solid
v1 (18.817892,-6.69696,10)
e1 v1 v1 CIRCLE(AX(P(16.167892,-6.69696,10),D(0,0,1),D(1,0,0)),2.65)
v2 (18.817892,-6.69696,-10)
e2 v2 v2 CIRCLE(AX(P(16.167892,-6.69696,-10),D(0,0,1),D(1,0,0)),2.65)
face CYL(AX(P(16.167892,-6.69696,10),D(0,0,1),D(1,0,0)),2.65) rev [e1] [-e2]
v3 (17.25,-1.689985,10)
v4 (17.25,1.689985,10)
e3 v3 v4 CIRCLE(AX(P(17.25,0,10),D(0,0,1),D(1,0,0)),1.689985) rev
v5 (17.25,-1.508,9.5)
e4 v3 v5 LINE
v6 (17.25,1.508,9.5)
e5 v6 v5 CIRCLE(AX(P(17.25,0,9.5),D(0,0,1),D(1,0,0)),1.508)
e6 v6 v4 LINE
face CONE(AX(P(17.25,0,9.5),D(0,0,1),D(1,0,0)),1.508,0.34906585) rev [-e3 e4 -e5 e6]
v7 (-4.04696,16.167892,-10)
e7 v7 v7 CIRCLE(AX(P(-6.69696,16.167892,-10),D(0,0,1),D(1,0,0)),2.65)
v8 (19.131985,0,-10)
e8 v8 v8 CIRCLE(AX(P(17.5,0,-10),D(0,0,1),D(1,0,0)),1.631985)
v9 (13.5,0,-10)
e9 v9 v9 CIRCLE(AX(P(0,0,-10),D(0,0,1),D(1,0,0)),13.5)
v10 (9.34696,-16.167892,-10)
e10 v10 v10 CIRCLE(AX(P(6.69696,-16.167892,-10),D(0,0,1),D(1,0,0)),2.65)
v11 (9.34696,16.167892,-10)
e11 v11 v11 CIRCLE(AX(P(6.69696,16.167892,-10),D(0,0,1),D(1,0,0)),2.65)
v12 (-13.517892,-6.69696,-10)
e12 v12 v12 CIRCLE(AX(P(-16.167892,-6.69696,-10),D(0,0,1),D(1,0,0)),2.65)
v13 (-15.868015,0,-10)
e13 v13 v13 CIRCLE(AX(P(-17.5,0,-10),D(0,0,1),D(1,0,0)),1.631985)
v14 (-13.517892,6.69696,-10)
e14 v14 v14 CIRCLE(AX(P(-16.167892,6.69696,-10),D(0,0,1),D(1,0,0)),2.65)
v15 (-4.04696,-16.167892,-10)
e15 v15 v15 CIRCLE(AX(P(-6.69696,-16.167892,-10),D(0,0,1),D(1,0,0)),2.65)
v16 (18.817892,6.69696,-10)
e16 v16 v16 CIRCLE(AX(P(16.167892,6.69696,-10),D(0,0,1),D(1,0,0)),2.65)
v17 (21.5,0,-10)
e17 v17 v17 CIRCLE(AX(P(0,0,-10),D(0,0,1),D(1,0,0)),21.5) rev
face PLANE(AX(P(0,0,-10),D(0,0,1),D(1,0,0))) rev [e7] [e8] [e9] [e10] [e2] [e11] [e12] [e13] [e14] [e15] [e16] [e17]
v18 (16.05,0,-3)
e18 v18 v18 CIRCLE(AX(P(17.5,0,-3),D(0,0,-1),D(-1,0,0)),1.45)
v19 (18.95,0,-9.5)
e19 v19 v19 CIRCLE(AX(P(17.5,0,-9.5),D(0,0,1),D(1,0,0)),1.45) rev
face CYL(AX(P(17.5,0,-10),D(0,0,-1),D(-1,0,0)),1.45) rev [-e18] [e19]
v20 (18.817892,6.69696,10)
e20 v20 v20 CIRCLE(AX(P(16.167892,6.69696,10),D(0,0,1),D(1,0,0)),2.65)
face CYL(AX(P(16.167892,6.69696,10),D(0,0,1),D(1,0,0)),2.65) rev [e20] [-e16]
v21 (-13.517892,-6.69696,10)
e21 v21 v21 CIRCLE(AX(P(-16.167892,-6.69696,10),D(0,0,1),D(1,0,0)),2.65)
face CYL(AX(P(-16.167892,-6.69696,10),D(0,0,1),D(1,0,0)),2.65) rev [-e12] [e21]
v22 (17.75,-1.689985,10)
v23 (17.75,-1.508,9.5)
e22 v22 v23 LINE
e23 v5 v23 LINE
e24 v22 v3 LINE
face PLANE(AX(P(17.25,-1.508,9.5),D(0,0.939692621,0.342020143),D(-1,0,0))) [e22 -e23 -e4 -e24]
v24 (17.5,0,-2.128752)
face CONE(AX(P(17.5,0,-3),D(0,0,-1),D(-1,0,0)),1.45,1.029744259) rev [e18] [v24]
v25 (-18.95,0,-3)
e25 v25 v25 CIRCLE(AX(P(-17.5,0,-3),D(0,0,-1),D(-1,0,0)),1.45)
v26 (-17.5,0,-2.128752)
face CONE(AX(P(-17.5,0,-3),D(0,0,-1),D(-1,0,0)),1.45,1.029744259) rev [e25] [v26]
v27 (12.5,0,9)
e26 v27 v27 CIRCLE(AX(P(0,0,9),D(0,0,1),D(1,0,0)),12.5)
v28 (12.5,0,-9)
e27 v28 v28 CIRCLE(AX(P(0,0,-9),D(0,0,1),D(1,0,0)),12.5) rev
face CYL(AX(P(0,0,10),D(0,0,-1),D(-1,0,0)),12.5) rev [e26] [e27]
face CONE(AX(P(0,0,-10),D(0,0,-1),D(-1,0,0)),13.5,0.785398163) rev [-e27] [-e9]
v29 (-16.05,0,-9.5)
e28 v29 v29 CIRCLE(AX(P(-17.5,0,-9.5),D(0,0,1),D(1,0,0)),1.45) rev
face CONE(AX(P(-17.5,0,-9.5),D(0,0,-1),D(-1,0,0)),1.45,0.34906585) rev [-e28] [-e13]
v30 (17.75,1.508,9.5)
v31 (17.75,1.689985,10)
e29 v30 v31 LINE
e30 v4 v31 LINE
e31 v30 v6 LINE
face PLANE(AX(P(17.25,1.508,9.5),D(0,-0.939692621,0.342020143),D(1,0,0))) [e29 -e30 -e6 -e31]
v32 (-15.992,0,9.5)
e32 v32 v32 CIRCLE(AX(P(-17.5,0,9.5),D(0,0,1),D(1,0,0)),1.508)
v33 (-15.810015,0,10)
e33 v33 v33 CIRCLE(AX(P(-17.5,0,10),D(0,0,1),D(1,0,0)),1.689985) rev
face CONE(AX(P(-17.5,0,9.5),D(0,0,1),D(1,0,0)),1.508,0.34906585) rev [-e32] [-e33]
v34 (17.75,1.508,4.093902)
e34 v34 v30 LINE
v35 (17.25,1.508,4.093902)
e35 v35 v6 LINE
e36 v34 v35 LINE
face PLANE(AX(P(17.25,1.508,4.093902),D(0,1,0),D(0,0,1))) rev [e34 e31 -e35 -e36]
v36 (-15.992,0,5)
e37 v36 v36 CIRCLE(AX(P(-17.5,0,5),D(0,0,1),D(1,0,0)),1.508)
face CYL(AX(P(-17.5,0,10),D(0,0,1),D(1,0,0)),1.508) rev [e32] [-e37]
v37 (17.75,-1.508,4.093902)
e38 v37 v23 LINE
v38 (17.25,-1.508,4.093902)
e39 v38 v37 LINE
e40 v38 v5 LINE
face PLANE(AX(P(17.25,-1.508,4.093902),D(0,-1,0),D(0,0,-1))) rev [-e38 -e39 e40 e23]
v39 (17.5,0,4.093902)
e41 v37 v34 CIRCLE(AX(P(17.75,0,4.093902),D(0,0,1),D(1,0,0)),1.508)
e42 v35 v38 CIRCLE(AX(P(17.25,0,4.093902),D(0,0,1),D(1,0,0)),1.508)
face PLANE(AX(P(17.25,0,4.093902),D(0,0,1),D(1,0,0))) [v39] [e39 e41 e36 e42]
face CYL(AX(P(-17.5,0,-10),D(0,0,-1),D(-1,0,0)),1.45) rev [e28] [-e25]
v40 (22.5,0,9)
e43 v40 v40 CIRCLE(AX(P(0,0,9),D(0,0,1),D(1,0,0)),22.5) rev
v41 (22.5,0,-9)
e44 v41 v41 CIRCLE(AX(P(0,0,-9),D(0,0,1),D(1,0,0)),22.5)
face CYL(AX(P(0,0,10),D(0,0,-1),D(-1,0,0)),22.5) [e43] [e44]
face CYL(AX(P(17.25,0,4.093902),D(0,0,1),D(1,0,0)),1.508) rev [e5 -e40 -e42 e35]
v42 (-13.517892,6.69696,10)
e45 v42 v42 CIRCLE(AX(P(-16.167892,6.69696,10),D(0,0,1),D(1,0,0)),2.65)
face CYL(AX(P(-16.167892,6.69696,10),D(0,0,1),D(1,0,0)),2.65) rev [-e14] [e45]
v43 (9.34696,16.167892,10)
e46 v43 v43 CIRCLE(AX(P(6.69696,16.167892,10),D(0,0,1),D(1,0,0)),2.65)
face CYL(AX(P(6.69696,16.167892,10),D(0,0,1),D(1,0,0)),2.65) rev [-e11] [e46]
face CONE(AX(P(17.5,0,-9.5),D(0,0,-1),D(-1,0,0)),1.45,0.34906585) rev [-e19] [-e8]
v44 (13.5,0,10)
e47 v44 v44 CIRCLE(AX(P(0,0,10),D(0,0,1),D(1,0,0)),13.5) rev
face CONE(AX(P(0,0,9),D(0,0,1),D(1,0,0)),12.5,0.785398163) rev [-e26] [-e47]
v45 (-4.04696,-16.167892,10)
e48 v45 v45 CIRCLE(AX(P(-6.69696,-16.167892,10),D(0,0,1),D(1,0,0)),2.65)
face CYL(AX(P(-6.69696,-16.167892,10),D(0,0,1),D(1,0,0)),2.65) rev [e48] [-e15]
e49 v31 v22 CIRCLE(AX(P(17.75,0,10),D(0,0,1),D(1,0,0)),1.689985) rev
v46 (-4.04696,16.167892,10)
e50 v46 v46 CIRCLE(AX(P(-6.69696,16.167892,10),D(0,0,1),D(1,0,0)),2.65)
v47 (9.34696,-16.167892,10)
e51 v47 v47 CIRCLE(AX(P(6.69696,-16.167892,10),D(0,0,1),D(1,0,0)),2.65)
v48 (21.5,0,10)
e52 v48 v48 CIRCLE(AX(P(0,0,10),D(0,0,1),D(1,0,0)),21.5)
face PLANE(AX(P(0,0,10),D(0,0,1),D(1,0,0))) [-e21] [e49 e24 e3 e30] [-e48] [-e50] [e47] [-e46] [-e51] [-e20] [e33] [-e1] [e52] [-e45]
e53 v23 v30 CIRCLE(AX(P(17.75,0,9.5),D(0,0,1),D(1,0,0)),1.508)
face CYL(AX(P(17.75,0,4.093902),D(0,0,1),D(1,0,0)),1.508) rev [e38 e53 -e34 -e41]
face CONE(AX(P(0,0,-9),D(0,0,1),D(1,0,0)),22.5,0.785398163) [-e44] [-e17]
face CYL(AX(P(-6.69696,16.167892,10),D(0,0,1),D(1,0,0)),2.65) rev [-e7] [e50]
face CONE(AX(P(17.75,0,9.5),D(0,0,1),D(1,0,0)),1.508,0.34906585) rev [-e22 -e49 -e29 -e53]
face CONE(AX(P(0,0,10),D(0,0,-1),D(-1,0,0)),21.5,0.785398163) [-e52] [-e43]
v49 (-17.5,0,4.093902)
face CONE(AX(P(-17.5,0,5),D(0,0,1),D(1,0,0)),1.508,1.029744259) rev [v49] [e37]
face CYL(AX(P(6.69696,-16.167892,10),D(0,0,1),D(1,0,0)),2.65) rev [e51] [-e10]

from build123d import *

# Parameters (mm, degrees)
SKETCH1_R                           = 22.5
SKETCH1_R_2                         = 12.5
BOSS_EXTRUDE1_DEPTH                 = 10
M5_CLEARANCE_HOLE1_D                = 5.3
F_3_0MM_CLEARANCE_DOWEL_HOLE1_D     = 3.016
F_3_0MM_CLEARANCE_DOWEL_HOLE1_DEPTH = 5
F_3_0MM_CLEARANCE_DOWEL_HOLE1_TIP   = 0.906097813
F_2_9_2_9_DIAMETER_HOLE1_D          = 2.9
F_2_9_2_9_DIAMETER_HOLE1_DEPTH      = 7
F_2_9_2_9_DIAMETER_HOLE1_TIP        = 0.871247898
CUT_EXTRUDE1_START                  = -5.906098
CUT_EXTRUDE1_DEPTH                  = 5.906098
CHAMFER1_SIZE                       = 1
CHAMFER2_SIZE                       = 0.181985117
CHAMFER2_SIZE_2                     = 0.5


with BuildPart() as part:
    # Sketch1 → Boss-Extrude1 (new, symmetric)
    with BuildSketch(Plane.XY):
        Circle(SKETCH1_R)
        Circle(SKETCH1_R_2, mode=Mode.SUBTRACT)
    extrude(amount=BOSS_EXTRUDE1_DEPTH, both=True)

    # M5 Clearance Hole1 (through all)
    with Locations(Plane.XY.offset(10)):
        with Locations((6.696960066, -16.167891819), (16.167891819, -6.696960066), (16.167891819, 6.696960066), (6.696960066, 16.167891819), (-6.696960066, 16.167891819), (-16.167891819, 6.696960066), (-16.167891819, -6.696960066), (-6.696960066, -16.167891819)):
            Hole(M5_CLEARANCE_HOLE1_D / 2)

    # Ø3.0mm Clearance Dowel Hole1
    with Locations(Plane.XY.offset(10)):
        with Locations((-17.5, 0), (17.5, 0)):
            Hole(F_3_0MM_CLEARANCE_DOWEL_HOLE1_D / 2, depth=F_3_0MM_CLEARANCE_DOWEL_HOLE1_DEPTH)
            with Locations((0, 0, -(F_3_0MM_CLEARANCE_DOWEL_HOLE1_DEPTH + F_3_0MM_CLEARANCE_DOWEL_HOLE1_TIP / 2))):  # 118° drill point
                Cone(0, F_3_0MM_CLEARANCE_DOWEL_HOLE1_D / 2, F_3_0MM_CLEARANCE_DOWEL_HOLE1_TIP, mode=Mode.SUBTRACT)

    # Ø2.9 (2.9) Diameter Hole1
    with Locations(Plane(origin=(0, 0, -10), x_dir=(-1, 0, 0), z_dir=(0, 0, -1))):
        with Locations((-17.5, 0), (17.5, 0)):
            Hole(F_2_9_2_9_DIAMETER_HOLE1_D / 2, depth=F_2_9_2_9_DIAMETER_HOLE1_DEPTH)
            with Locations((0, 0, -(F_2_9_2_9_DIAMETER_HOLE1_DEPTH + F_2_9_2_9_DIAMETER_HOLE1_TIP / 2))):  # 118° drill point
                Cone(0, F_2_9_2_9_DIAMETER_HOLE1_D / 2, F_2_9_2_9_DIAMETER_HOLE1_TIP, mode=Mode.SUBTRACT)

    # Sketch8 → Cut-Extrude1 (cut)
    with BuildSketch(Plane.XY.offset(10).offset(CUT_EXTRUDE1_START)):
        with BuildLine():
            Line((17.25, 1.508), (17.75, 1.508))
            ThreePointArc((17.75, 1.508), (19.258, 0), (17.75, -1.508))
            Line((17.75, -1.508), (17.25, -1.508))
            ThreePointArc((17.25, -1.508), (15.742, 0), (17.25, 1.508))
        make_face()
    extrude(amount=CUT_EXTRUDE1_DEPTH, mode=Mode.SUBTRACT)

    # Chamfer1
    chamfer1_edges = [part.edges().sort_by_distance(p)[0] for p in [
        (-22.5, 0, -10),
        (-22.5, 0, 10),
        (-12.5, 0, -10),
        (-12.5, 0, 10),
    ]]
    chamfer(chamfer1_edges, length=CHAMFER1_SIZE)

    # Chamfer2
    # the kernel refuses this chamfer: 0.5, 0.181985117 mm, written as the material it takes off along each edge
    with BuildSketch(Plane(origin=(-17.5, 0, 10), x_dir=(-1, 0, 0), z_dir=(0, -1, 0))) as chamfer2_piece_1:
        Polygon((1.508 + CHAMFER2_SIZE, 0), (1.508, CHAMFER2_SIZE_2), (1.508, 0), align=None)
    revolve(axis=Axis((-17.5, 0, 10), (0, 0, -1)), mode=Mode.SUBTRACT)
    with BuildSketch(Plane(origin=(-17.5, 0, -10), x_dir=(1, 0, 0), z_dir=(0, -1, 0))) as chamfer2_piece_2:
        Polygon((1.45 + CHAMFER2_SIZE, 0), (1.45, CHAMFER2_SIZE_2), (1.45, 0), align=None)
    revolve(axis=Axis((-17.5, 0, -10), (0, 0, 1)), mode=Mode.SUBTRACT)
    with BuildSketch(Plane(origin=(17.5, 0, -10), x_dir=(1, 0, 0), z_dir=(0, -1, 0))) as chamfer2_piece_3:
        Polygon((1.45 + CHAMFER2_SIZE, 0), (1.45, CHAMFER2_SIZE_2), (1.45, 0), align=None)
    revolve(axis=Axis((17.5, 0, -10), (0, 0, 1)), mode=Mode.SUBTRACT)
    with BuildSketch(Plane(origin=(17.75, -1.508, 10), x_dir=(0, -0.9950833631817482, 0.09904090225205342), z_dir=(-1, 0, 0)), Plane(origin=(17.5, 1.508, 10), x_dir=(0, 0.9950833631817482, 0.09904090225205342), z_dir=(1, 0, 0)), Plane(origin=(17.5, -1.508, 10), x_dir=(0, -0.9950833631817482, 0.09904090225205342), z_dir=(-1, 0, 0)), Plane(origin=(17.25, 1.508, 10), x_dir=(0, 0.9950833631817482, 0.09904090225205342), z_dir=(1, 0, 0))) as chamfer2_piece_4:
        Polygon((CHAMFER2_SIZE * 0.99508336391, -CHAMFER2_SIZE * 0.0990409023245), (-CHAMFER2_SIZE_2 * 0.0990409022521, -CHAMFER2_SIZE_2 * 0.995083363182), (0, 0), align=None)
    extrude(amount=0.25, mode=Mode.SUBTRACT)
    with BuildSketch(Plane(origin=(17.25, 0, 10), x_dir=(0, -1, 0), z_dir=(1, 0, 0))) as chamfer2_piece_5:
        Polygon((1.508 + CHAMFER2_SIZE, 0), (1.508, CHAMFER2_SIZE_2), (1.508, 0), align=None)
    revolve(axis=Axis((17.25, 0, 10), (0, 0, -1)), revolution_arc=180, mode=Mode.SUBTRACT)
    with BuildSketch(Plane(origin=(17.75, 0, 10), x_dir=(0, 1, 0), z_dir=(-1, 0, 0))) as chamfer2_piece_6:
        Polygon((1.508 + CHAMFER2_SIZE, 0), (1.508, CHAMFER2_SIZE_2), (1.508, 0), align=None)
    revolve(axis=Axis((17.75, 0, 10), (0, 0, -1)), revolution_arc=180, mode=Mode.SUBTRACT)


solid = part.part
